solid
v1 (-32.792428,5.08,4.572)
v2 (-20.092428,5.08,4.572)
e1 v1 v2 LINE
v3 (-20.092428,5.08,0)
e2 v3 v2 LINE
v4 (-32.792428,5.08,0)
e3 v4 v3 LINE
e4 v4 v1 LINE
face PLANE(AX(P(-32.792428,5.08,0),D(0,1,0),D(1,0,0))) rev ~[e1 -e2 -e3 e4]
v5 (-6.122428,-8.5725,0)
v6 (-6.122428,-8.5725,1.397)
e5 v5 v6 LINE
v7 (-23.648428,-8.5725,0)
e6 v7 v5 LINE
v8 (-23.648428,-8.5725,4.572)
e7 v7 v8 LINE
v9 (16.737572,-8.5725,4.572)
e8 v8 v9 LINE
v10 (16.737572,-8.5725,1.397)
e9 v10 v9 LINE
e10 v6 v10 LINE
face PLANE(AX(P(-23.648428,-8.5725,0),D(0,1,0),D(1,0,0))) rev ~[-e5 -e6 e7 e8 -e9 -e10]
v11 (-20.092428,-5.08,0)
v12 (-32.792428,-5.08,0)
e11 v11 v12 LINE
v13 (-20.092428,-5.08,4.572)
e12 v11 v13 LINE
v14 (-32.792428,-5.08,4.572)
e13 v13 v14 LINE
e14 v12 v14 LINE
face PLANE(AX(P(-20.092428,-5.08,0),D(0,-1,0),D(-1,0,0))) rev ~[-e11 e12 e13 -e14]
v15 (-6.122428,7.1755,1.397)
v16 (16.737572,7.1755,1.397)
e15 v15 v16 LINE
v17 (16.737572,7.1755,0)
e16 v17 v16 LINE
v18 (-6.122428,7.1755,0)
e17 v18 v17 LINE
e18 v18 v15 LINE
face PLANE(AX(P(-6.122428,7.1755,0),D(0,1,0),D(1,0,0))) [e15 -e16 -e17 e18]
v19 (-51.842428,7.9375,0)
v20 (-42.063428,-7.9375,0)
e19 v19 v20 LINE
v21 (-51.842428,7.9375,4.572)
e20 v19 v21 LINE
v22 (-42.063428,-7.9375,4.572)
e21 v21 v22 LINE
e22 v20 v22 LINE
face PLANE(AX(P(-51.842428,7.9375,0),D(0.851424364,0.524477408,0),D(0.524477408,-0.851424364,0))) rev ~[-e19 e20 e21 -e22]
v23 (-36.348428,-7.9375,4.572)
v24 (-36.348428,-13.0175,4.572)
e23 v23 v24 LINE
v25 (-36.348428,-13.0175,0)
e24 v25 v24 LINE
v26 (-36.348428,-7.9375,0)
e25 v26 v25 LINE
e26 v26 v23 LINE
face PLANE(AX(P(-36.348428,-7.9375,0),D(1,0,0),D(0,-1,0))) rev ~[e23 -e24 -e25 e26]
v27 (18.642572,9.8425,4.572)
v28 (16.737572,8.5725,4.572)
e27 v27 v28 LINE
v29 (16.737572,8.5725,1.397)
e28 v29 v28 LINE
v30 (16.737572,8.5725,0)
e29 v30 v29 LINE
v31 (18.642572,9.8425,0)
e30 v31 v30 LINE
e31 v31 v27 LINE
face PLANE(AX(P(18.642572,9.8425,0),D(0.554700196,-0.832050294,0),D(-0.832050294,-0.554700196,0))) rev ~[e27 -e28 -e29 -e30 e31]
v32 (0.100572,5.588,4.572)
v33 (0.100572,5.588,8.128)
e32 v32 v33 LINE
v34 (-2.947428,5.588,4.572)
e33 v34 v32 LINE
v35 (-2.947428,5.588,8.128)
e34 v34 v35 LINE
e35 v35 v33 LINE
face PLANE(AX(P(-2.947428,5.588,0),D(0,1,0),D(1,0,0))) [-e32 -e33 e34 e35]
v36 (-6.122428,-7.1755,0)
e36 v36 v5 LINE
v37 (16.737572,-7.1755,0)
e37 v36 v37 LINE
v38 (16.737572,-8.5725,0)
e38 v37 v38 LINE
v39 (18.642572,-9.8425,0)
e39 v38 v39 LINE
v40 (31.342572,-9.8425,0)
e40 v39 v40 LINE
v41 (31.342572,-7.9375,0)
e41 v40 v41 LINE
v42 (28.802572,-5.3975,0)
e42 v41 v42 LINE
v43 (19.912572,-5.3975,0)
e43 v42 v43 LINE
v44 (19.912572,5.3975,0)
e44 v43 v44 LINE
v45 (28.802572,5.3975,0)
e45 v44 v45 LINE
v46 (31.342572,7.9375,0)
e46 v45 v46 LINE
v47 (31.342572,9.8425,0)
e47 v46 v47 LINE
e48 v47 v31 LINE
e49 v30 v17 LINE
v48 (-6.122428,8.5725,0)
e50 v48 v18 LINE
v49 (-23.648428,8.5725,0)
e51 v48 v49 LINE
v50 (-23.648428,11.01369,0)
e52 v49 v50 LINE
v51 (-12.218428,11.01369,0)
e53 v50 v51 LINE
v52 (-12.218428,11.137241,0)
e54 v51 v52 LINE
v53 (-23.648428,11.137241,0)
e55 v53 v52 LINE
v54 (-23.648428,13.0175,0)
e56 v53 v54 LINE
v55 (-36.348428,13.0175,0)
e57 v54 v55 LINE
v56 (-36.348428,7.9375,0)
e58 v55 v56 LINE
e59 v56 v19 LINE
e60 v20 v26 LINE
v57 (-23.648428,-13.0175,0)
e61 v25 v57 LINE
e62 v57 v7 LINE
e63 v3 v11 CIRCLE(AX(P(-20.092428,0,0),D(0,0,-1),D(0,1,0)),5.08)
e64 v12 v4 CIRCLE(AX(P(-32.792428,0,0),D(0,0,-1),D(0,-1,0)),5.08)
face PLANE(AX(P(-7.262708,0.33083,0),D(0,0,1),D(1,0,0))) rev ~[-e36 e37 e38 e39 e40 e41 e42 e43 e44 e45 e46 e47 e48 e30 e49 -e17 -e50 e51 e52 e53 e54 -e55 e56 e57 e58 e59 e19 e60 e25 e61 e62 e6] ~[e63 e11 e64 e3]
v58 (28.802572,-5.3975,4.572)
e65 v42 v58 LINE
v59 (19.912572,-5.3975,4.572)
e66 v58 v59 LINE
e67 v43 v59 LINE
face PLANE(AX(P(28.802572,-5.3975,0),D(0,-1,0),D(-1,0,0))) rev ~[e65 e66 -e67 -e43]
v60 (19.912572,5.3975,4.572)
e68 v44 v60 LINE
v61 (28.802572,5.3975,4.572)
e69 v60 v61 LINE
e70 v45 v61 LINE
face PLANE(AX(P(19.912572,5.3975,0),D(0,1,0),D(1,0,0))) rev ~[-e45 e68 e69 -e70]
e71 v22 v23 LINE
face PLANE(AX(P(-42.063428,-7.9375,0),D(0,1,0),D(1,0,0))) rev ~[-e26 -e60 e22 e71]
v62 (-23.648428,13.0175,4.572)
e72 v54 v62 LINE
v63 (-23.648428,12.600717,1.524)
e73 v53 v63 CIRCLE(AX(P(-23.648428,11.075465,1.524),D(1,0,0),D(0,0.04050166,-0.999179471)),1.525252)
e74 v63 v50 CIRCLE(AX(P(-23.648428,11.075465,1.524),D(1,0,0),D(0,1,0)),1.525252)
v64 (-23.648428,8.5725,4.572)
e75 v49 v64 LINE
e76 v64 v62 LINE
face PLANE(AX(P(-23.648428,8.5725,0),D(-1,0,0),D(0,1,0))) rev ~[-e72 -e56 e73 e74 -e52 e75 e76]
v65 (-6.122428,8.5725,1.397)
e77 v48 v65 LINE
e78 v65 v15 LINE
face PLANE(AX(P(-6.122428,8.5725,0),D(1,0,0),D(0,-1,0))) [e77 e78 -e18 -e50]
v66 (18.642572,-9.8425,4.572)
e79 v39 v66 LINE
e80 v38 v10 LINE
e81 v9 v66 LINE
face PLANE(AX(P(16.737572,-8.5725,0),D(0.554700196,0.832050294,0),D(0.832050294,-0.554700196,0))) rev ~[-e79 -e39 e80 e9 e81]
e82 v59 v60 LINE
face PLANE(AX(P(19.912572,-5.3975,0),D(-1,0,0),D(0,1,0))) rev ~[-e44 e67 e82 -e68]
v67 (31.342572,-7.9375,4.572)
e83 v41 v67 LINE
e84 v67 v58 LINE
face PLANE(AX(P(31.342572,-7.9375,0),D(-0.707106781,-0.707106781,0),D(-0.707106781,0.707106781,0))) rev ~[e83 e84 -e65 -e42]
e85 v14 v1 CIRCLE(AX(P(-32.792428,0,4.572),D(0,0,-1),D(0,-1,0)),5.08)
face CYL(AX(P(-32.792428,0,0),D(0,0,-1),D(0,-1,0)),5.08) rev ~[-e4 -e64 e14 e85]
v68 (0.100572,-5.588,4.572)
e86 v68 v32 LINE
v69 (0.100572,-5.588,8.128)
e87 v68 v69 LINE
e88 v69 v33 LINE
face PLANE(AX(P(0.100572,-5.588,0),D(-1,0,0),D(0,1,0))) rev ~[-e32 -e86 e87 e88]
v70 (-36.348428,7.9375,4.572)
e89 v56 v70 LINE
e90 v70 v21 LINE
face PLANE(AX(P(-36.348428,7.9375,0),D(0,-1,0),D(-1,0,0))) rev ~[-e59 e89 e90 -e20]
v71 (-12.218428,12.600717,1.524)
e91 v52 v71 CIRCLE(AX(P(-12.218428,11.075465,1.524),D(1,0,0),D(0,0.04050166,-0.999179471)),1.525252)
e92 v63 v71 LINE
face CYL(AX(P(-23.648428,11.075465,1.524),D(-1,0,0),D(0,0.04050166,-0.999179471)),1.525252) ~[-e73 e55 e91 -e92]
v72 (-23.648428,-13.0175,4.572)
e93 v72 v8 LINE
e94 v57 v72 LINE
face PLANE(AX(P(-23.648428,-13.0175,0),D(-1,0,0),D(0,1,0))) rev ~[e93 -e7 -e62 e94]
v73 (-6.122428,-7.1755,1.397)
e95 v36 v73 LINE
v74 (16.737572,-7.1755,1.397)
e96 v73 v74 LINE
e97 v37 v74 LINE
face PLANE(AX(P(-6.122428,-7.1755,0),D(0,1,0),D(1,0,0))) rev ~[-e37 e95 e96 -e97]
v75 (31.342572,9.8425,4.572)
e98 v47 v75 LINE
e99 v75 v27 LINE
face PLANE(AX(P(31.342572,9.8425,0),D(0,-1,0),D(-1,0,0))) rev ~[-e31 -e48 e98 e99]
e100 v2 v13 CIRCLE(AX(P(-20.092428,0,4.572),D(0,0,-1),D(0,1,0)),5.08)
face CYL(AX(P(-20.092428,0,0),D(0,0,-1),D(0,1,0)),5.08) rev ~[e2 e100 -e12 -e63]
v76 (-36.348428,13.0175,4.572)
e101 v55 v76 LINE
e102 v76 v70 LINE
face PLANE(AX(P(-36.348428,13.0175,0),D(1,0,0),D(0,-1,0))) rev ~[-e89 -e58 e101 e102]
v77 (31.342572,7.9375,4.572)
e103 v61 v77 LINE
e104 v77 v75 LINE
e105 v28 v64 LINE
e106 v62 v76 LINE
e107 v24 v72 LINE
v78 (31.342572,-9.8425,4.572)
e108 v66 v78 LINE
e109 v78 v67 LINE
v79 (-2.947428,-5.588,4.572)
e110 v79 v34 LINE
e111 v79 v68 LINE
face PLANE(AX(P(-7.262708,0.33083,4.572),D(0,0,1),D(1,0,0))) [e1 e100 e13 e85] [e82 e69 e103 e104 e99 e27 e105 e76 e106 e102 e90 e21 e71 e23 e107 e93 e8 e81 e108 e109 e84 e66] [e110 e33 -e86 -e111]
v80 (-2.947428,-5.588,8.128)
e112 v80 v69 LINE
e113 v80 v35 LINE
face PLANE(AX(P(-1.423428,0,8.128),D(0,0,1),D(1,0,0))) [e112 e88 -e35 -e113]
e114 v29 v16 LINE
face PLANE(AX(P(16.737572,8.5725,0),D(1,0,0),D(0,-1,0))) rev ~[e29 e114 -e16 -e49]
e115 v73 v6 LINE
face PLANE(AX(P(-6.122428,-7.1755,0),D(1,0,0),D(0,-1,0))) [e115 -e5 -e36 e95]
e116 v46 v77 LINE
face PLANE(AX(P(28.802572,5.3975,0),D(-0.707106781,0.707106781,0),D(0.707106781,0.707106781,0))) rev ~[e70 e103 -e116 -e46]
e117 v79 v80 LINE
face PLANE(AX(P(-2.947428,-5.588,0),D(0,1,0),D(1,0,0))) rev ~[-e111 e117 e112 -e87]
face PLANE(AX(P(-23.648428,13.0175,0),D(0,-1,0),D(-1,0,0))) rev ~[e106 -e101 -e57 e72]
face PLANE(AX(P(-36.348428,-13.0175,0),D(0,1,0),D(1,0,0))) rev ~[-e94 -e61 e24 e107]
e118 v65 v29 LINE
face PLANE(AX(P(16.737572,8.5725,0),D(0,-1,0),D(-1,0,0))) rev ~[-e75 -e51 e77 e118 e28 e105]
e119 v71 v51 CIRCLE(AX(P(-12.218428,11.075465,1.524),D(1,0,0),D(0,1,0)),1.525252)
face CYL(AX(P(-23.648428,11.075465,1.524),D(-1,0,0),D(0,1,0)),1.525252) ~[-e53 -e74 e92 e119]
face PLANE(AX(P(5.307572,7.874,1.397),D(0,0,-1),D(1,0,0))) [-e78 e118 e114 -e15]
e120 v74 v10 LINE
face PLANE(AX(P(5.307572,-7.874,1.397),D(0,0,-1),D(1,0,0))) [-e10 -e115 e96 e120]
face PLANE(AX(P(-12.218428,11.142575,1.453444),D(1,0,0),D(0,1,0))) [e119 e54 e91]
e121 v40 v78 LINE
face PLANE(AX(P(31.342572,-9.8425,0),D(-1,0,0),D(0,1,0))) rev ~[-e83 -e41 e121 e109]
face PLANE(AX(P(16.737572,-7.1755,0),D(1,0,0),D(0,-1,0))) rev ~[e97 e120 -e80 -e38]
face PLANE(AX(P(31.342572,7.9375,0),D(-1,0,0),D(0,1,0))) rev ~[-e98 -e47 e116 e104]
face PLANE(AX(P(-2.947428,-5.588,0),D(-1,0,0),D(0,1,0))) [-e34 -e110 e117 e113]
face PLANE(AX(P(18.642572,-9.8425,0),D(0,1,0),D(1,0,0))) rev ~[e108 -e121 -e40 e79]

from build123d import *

# Parameters (mm, degrees)
F0_W     = 3.048
F0_H     = 11.176
F1_DEPTH = 4.572
F2_DEPTH = 8.128
F4_DEPTH = 11.43
F5_W     = 22.86
F5_H     = 1.397
F6_DEPTH = 1.397
F7_DEPTH = 1.397


# Not quite as in the source:
# - a feature names something its author has since deleted; it is built from what else it names


with BuildPart() as f1:
    # F0 (on Top) → F1 (new body)
    with BuildSketch(Plane.XY):
        Polygon((18.64257236, -9.8425), (31.34257236, -9.8425), (31.34257236, -7.9375), (28.80257236, -5.3975), (19.91257236, -5.3975), (19.91257236, 5.3975), (28.80257236, 5.3975), (31.34257236, 7.9375), (31.34257236, 9.8425), (18.64257236, 9.8425), (16.73757236, 8.5725), (-23.64842764, 8.5725), (-23.64842764, 13.0175), (-36.34842764, 13.0175), (-36.34842764, 7.9375), (-51.84242764, 7.9375), (-42.06342764, -7.9375), (-36.34842764, -7.9375), (-36.34842764, -13.0175), (-23.64842764, -13.0175), (-23.64842764, -8.5725), (16.73757236, -8.5725), align=None)
        with BuildLine():
            Line((-32.79242764, 5.08), (-20.09242764, 5.08))
            ThreePointArc((-20.09242764, 5.08), (-15.01242764, 0), (-20.09242764, -5.08))
            Line((-20.09242764, -5.08), (-32.79242764, -5.08))
            ThreePointArc((-32.79242764, -5.08), (-37.87242764, 0), (-32.79242764, 5.08))
        make_face(mode=Mode.SUBTRACT)
        with Locations((-1.42342764, 0)):
            Rectangle(F0_W, F0_H, mode=Mode.SUBTRACT)
    extrude(amount=F1_DEPTH)

    # F0 (on Top) → F2 (join)
    with BuildSketch(Plane.XY):
        with Locations((-1.42342764, 0)):
            Rectangle(F0_W, F0_H)
    extrude(amount=F2_DEPTH)

    # F3 (on face) → F4 (join)
    with BuildSketch(Plane.YZ.offset(-23.64842764)):
        with BuildLine():
            ThreePointArc((11.1372406919, 0), (12.1756052203, 0.4675508925), (12.6007169871, 1.524))
            ThreePointArc((12.6007169871, 1.524), (10.0190163668, 2.624139746), (11.0136902567, 0))
            Line((11.0136902567, 0), (11.1372406919, 0))
        make_face()
    extrude(amount=F4_DEPTH)

    # F5 (on face) → F6 (cut)
    with BuildSketch(Plane(origin=(0, 0, 0), x_dir=(1, 0, 0), z_dir=(0, 0, -1))):
        with Locations((5.30757236, 7.874)):
            Rectangle(F5_W, F5_H)
    extrude(amount=-F6_DEPTH, mode=Mode.SUBTRACT)

    # F5 (on face) → F7 (cut)
    with BuildSketch(Plane(origin=(0, 0, 0), x_dir=(1, 0, 0), z_dir=(0, 0, -1))):
        with Locations((5.30757236, -7.874)):
            Rectangle(F5_W, F5_H)
    extrude(amount=-F7_DEPTH, mode=Mode.SUBTRACT)


solid = f1.part
